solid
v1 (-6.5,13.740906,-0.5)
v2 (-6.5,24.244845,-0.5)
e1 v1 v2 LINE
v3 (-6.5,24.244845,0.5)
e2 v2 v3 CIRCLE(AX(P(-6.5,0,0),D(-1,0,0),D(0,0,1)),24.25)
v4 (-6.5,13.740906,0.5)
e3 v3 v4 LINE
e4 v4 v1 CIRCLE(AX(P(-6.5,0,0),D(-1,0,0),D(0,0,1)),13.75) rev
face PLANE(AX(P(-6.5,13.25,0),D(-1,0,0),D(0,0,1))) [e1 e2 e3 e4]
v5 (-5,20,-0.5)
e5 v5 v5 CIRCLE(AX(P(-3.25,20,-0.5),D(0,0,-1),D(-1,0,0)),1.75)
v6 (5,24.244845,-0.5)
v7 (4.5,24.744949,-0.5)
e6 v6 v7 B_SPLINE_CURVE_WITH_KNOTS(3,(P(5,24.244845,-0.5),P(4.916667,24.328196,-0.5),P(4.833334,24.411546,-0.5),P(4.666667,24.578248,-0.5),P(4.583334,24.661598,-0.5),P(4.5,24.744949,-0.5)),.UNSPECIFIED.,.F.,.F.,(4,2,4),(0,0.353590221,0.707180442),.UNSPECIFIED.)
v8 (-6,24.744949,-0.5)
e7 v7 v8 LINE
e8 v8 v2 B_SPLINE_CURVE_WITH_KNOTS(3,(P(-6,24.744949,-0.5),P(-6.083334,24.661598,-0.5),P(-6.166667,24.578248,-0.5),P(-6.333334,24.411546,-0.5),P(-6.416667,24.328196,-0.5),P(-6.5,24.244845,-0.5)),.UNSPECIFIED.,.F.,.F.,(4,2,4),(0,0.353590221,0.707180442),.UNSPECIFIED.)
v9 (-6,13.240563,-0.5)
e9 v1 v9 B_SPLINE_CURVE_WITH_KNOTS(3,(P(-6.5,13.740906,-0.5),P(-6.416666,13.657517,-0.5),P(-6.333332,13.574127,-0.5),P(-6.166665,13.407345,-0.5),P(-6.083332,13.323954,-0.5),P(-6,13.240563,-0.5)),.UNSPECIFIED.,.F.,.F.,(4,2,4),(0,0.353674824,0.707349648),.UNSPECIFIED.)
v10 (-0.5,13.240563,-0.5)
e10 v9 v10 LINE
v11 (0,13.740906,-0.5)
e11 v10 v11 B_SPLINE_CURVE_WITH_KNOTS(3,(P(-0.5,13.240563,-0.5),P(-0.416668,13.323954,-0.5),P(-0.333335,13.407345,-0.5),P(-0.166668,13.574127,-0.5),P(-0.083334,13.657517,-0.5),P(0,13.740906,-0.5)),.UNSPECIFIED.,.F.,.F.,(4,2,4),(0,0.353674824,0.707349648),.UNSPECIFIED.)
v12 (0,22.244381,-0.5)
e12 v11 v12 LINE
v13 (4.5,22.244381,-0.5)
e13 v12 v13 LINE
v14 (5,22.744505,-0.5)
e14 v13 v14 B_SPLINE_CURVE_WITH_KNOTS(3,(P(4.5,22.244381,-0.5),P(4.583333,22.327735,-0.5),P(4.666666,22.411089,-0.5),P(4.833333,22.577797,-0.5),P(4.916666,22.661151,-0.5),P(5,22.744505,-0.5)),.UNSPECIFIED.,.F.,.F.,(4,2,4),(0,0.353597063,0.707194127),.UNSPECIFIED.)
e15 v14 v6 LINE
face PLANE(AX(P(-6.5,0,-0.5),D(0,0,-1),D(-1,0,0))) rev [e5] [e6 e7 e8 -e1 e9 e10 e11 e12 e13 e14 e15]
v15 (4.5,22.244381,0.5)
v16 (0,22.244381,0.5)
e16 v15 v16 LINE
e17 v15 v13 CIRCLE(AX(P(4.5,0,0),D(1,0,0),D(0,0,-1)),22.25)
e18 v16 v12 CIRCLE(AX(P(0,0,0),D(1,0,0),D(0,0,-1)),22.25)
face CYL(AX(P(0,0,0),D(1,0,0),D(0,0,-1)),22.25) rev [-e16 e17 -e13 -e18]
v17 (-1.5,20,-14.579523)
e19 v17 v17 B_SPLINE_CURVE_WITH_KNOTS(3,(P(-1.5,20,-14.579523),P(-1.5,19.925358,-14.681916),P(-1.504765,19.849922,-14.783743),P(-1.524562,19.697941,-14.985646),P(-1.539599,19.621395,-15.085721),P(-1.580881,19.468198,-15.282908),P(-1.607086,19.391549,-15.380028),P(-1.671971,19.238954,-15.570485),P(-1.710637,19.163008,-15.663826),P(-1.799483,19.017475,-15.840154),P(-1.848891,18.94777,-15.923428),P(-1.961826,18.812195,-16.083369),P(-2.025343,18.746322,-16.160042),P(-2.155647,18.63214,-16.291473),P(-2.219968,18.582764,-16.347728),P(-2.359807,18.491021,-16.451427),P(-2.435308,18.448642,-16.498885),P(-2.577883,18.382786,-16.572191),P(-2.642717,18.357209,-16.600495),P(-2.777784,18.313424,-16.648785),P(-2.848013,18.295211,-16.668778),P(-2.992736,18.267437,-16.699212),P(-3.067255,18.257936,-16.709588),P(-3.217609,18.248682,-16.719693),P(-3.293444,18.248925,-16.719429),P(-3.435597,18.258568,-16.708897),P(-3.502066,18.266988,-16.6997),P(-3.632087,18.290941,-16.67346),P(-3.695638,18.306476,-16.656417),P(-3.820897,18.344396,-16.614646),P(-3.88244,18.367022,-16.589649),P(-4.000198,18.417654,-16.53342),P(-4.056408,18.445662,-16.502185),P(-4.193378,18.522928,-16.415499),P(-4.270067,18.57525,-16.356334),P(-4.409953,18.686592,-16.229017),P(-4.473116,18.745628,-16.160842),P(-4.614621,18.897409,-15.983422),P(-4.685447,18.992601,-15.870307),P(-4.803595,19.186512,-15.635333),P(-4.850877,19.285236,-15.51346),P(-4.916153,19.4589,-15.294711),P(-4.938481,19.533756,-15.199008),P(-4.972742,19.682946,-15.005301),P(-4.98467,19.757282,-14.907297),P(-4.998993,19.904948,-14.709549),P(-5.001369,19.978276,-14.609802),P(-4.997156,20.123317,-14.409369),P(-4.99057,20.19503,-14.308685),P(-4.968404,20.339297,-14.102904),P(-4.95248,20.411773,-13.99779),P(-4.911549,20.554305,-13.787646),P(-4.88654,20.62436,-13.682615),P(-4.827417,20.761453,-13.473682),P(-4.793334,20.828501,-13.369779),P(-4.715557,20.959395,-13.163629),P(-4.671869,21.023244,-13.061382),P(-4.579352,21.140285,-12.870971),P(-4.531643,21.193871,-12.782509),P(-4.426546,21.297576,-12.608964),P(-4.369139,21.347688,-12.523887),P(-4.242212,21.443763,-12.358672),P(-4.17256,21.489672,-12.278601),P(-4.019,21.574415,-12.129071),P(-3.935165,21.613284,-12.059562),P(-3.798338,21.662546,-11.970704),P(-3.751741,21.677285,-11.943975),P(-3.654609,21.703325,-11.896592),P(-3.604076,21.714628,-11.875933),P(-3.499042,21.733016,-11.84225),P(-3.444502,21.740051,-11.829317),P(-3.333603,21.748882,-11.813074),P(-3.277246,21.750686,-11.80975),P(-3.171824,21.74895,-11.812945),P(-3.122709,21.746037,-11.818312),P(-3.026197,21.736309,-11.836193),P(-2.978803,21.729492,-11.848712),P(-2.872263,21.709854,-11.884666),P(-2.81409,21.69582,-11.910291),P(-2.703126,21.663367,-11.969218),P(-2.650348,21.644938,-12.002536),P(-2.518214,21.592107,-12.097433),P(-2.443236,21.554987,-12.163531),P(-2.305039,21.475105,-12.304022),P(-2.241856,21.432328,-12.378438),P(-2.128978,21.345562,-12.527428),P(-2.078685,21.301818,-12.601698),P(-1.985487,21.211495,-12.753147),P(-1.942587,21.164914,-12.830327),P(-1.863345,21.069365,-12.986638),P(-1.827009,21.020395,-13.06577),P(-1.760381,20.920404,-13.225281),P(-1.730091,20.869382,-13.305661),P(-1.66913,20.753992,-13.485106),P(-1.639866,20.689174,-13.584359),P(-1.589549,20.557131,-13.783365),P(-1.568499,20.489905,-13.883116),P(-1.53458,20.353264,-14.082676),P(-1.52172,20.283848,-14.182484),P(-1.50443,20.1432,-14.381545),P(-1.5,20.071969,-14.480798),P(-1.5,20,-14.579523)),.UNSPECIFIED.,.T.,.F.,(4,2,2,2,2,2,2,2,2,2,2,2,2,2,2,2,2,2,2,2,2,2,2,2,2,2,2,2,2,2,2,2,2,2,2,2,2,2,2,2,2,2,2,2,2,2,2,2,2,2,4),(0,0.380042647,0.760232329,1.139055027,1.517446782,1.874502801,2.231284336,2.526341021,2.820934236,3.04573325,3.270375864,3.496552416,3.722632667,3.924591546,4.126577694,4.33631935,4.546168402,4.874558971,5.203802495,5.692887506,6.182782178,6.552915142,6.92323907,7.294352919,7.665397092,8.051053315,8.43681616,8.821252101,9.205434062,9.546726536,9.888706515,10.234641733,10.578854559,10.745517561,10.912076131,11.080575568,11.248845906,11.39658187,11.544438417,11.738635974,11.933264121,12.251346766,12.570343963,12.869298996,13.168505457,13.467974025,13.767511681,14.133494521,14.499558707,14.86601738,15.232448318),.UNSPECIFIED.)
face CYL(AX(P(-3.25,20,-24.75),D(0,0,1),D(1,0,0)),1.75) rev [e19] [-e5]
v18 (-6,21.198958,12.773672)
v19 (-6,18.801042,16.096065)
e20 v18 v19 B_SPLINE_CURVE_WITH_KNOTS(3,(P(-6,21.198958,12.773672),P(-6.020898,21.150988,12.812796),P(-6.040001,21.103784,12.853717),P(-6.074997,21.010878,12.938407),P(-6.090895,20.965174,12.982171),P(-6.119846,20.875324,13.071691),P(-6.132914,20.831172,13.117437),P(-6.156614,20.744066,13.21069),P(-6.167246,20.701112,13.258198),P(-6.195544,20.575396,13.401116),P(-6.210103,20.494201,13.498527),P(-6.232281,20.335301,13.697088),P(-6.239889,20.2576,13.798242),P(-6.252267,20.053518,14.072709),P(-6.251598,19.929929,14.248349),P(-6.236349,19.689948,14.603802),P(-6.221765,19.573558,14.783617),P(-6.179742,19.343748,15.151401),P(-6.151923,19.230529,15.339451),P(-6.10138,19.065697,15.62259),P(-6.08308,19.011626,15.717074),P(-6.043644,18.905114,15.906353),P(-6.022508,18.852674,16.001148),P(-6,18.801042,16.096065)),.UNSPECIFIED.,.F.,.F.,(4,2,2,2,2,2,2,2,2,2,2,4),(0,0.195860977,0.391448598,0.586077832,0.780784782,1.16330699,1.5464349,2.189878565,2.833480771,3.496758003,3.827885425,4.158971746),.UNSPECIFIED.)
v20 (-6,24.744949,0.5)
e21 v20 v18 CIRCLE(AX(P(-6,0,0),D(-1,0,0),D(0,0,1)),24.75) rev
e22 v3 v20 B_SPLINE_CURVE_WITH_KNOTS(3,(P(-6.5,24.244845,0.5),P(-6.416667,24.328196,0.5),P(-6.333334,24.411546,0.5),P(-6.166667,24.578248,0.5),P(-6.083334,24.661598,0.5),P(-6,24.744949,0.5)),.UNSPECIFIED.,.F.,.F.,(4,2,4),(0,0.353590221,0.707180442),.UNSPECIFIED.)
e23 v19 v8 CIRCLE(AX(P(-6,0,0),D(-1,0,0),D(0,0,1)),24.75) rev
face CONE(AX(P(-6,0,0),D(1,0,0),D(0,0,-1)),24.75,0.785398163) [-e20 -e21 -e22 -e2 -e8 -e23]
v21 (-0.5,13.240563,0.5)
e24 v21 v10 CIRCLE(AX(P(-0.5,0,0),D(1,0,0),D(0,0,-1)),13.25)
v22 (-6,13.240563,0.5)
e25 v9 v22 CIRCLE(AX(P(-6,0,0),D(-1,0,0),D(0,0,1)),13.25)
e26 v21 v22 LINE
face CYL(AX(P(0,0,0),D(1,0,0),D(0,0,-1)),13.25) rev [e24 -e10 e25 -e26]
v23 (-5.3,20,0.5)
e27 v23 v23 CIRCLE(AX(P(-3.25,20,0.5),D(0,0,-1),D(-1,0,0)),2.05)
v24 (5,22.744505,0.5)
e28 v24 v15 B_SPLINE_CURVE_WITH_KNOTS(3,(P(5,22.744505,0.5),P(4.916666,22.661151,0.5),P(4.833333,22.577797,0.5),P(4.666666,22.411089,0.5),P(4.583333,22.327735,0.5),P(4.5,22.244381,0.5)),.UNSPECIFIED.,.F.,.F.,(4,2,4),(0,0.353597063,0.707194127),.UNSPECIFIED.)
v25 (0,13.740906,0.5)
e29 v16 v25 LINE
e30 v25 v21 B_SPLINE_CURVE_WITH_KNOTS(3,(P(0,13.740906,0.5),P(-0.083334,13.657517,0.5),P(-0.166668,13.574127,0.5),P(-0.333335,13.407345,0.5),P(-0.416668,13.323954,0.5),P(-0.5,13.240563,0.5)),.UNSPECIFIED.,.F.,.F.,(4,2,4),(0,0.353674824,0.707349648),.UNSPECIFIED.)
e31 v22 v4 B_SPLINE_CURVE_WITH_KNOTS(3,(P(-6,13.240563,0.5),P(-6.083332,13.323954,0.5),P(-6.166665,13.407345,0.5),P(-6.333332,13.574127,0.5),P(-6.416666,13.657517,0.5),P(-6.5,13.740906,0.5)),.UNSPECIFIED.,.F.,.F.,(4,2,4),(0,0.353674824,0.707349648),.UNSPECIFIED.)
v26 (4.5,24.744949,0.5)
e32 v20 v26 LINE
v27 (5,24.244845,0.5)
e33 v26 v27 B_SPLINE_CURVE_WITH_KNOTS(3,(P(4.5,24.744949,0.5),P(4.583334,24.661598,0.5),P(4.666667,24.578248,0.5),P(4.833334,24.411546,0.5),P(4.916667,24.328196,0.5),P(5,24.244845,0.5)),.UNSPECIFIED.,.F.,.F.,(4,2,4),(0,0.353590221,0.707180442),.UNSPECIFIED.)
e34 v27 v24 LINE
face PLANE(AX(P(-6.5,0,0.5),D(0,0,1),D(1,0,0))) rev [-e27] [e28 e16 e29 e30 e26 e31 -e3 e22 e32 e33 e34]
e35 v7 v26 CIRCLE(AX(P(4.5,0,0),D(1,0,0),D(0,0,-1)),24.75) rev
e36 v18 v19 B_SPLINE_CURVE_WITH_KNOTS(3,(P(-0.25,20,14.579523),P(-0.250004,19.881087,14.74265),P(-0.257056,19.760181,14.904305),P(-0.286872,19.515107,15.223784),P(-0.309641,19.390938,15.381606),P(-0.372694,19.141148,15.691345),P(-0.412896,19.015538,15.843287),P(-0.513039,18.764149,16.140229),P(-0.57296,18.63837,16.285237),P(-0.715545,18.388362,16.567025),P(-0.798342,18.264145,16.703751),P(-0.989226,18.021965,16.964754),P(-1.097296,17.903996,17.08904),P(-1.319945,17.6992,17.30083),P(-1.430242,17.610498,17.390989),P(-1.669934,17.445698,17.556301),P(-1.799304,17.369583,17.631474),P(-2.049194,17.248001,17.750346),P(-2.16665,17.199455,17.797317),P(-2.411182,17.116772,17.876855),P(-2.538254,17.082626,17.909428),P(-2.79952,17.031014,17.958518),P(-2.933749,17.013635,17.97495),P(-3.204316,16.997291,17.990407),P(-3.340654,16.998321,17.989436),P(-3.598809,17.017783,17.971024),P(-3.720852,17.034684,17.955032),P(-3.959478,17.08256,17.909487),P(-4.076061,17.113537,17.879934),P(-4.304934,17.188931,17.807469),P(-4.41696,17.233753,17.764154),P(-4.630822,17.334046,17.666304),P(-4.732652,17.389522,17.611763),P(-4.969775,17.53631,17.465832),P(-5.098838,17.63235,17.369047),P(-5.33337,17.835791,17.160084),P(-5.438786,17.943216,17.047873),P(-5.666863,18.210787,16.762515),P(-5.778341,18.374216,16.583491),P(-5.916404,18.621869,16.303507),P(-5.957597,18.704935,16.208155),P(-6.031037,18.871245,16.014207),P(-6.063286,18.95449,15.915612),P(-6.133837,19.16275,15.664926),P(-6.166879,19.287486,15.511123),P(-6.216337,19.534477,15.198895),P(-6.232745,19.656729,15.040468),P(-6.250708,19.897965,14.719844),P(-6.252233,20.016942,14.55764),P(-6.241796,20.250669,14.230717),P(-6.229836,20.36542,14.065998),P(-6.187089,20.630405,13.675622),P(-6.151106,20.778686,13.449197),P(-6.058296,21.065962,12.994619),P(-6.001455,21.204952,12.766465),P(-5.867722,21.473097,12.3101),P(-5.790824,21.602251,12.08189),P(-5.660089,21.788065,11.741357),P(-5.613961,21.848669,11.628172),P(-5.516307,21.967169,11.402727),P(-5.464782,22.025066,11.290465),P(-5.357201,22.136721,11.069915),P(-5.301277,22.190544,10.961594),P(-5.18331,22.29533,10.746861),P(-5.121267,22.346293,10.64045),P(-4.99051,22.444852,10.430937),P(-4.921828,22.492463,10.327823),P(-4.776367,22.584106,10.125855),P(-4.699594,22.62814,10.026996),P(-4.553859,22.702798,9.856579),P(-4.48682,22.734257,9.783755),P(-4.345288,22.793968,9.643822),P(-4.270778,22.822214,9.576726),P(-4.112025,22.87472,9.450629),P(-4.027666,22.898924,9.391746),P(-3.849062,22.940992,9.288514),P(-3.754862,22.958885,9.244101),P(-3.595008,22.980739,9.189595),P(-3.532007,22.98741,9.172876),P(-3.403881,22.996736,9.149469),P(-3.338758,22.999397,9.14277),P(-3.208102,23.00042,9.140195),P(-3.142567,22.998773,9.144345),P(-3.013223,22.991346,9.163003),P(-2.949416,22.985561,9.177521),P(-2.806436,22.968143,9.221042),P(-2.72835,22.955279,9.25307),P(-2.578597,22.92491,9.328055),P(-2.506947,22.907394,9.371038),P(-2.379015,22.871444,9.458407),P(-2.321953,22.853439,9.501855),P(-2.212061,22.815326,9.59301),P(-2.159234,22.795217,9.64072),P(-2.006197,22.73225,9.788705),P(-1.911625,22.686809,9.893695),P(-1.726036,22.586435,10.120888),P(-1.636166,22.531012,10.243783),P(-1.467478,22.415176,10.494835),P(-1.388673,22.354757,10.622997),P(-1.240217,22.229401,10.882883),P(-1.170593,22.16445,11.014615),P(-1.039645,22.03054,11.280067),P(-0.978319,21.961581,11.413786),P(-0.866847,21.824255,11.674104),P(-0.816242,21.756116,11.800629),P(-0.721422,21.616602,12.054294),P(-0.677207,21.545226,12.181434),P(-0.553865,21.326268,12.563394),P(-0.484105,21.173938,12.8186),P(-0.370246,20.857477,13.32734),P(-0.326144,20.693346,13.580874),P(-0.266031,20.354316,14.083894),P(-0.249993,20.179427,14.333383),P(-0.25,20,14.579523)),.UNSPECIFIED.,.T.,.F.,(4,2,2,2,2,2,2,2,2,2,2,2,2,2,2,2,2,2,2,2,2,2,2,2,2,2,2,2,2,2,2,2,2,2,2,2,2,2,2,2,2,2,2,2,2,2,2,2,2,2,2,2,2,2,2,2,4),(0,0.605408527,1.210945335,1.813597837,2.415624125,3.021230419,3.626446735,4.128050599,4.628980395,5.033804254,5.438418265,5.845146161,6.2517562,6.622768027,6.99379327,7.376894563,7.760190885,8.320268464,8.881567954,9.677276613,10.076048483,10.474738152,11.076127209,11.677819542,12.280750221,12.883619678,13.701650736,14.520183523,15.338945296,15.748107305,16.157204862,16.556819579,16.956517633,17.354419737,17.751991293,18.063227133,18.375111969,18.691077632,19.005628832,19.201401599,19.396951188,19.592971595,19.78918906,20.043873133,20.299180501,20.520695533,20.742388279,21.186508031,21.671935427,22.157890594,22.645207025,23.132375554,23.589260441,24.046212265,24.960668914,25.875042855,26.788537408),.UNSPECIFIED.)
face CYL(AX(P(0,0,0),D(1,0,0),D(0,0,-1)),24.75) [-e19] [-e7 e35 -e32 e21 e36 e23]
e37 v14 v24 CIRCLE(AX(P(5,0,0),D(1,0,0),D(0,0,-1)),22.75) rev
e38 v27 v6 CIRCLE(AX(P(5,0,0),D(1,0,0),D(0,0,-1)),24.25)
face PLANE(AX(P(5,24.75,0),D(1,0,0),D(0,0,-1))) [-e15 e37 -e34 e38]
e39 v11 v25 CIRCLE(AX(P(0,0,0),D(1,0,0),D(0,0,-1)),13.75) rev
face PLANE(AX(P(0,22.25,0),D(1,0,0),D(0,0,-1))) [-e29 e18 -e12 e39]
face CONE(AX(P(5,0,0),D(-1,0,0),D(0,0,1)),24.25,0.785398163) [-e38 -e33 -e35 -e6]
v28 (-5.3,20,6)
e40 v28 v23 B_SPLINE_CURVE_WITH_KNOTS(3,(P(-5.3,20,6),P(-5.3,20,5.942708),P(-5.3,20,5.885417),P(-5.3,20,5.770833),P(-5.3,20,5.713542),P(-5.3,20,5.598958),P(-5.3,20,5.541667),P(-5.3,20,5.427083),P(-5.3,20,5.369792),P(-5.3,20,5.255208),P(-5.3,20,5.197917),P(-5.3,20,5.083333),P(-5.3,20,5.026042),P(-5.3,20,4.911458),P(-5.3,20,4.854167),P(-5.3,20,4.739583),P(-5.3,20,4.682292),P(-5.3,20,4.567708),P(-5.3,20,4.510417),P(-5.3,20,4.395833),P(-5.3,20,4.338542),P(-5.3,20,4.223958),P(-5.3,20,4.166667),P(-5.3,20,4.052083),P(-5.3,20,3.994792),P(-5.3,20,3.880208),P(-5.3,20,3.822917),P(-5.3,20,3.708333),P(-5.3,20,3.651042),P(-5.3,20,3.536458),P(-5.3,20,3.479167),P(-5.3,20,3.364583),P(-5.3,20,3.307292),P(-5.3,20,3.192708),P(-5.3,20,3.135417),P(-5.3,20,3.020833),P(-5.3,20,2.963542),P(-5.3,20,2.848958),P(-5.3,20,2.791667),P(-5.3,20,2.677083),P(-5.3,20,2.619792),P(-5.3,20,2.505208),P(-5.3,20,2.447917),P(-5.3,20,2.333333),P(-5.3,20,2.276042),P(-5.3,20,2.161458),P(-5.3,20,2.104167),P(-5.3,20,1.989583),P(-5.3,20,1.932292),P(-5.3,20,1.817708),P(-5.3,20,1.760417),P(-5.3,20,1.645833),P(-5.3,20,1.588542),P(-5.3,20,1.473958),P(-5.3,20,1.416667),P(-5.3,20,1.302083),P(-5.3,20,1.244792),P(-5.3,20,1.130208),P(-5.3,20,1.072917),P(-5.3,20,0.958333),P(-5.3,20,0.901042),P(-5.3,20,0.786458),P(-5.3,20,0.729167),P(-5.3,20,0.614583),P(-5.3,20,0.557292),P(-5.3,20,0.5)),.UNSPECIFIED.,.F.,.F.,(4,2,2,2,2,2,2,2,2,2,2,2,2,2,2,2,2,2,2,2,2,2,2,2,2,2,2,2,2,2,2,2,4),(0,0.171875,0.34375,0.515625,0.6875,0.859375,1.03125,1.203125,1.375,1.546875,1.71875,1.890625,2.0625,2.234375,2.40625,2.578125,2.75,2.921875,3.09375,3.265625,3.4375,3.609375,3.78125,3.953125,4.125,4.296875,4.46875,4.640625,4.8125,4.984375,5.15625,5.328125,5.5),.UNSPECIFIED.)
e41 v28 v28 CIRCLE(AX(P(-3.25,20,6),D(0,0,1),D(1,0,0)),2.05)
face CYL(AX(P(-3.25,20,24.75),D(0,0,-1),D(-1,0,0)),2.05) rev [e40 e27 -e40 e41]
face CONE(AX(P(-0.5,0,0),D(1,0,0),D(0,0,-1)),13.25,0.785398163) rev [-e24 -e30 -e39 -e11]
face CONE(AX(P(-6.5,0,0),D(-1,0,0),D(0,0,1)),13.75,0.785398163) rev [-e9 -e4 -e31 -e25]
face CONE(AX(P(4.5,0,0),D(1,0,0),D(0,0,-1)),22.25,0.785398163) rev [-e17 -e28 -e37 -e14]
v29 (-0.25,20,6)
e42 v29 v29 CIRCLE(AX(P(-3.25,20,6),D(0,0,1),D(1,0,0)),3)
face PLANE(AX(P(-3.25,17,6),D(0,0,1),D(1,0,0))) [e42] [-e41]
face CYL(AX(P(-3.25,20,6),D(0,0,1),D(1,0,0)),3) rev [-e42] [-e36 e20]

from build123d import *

# Parameters (mm, degrees)
ESQUISSE2_W                  = 1
ESQUISSE2_H                  = 24.75
ENL_V_MAT_EXTRU_1_DEPTH      = 37.842570486
ENL_V_MAT_EXTRU_2_DEPTH      = 36.600210674
ENL_V_MAT_EXTRU_2_DEPTH_BACK = 36.600210674
ESQUISSE3_R                  = 1.75
ESQUISSE4_W                  = 11.987843117
ESQUISSE4_H                  = 3
CHANFREIN1_SIZE              = 0.5
ESQUISSE5_R                  = 2.05
ENL_V_MAT_EXTRU_3_DEPTH      = 36.949617679


with BuildPart() as part:
    # Esquisse1 → Révolution1 (revolve)
    with BuildSketch(Plane.XY, mode=Mode.PRIVATE) as r_volution1_sk:
        Polygon((0, 13.25), (-6.5, 13.25), (-6.5, 24.75), (5, 24.75), (5, 22.25), (0, 22.25), align=None)
    revolve(r_volution1_sk.sketch.rotate(Axis((0, 0, 0), (-1, 0, 0)), 90), axis=Axis((0, 0, 0), (-1, 0, 0)))

    # Esquisse2 → Enlèv. mat.-Extru.1 (cut, through all)
    with BuildSketch(Plane(origin=(5, 0, 0), x_dir=(0, 0, -1), z_dir=(1, 0, 0))):
        with Locations((0, 12.375)):
            Rectangle(ESQUISSE2_W, ESQUISSE2_H)
    extrude(amount=-ENL_V_MAT_EXTRU_1_DEPTH, mode=Mode.SUBTRACT)

    # Esquisse3 → Enlèv. mat.-Extru.2 (cut, two sides: drawn at the far end of the back side and taken through both)
    with BuildSketch(Plane.XY.offset(-ENL_V_MAT_EXTRU_2_DEPTH_BACK)):
        with Locations((-3.25, 20)):
            Circle(ESQUISSE3_R)
    extrude(amount=ENL_V_MAT_EXTRU_2_DEPTH + ENL_V_MAT_EXTRU_2_DEPTH_BACK, mode=Mode.SUBTRACT)

    # Esquisse4 → Enlèvement de matière-Révolution1 (revolve, cut)
    with BuildSketch(Plane.ZY.offset(3.25), mode=Mode.PRIVATE) as enl_vement_de_mati_re_r_volution1_sk:
        with Locations((11.993921559, 18.5)):
            Rectangle(ESQUISSE4_W, ESQUISSE4_H)
    revolve(enl_vement_de_mati_re_r_volution1_sk.sketch.rotate(Axis((-3.25, 20, 6), (0, 0, -1)), 270), axis=Axis((-3.25, 20, 6), (0, 0, -1)), mode=Mode.SUBTRACT)

    # Chanfrein1
    # the kernel refuses this chamfer: 0.5 mm, written as the material it takes off along each edge
    with BuildSketch(Plane(origin=(5, 0, 0), x_dir=(0, 0, -1), z_dir=(0, 1, 0))) as chanfrein1_piece_1:
        Polygon((22.25, CHANFREIN1_SIZE), (22.25 + CHANFREIN1_SIZE, 0), (22.25, 0), align=None)
    chanfrein1_piece_1_solid = revolve(axis=Axis((5, 0, 0), (-1, 0, 0)), revolution_arc=272.035388743, mode=Mode.PRIVATE)
    with BuildSketch(Plane(origin=(5, 0, 0), x_dir=(0, 0, -1), z_dir=(0, 1, 0))) as chanfrein1_piece_2:
        Polygon((24.75, CHANFREIN1_SIZE), (24.75 - CHANFREIN1_SIZE, 0), (24.75, 0), align=None)
    chanfrein1_piece_2_solid = revolve(axis=Axis((5, 0, 0), (-1, 0, 0)), revolution_arc=271.829822987, mode=Mode.PRIVATE)
    with BuildSketch(Plane(origin=(-6.5, 0, 0), x_dir=(0, 0, -1), z_dir=(0, 1, 0))) as chanfrein1_piece_3:
        Polygon((24.75, -CHANFREIN1_SIZE), (24.75 - CHANFREIN1_SIZE, 0), (24.75, 0), align=None)
    chanfrein1_piece_3_solid = revolve(axis=Axis((-6.5, 0, 0), (-1, 0, 0)), revolution_arc=271.829822987, mode=Mode.PRIVATE)
    with BuildSketch(Plane(origin=(0, 0, 0), x_dir=(0, 0, -1), z_dir=(0, 1, 0))) as chanfrein1_piece_4:
        Polygon((13.25, CHANFREIN1_SIZE), (13.25 + CHANFREIN1_SIZE, 0), (13.25, 0), align=None)
    chanfrein1_piece_4_solid = revolve(axis=Axis((0, 0, 0), (-1, 0, 0)), revolution_arc=273.417455425, mode=Mode.PRIVATE)
    with BuildSketch(Plane(origin=(-6.5, 0, 0), x_dir=(0, 0, -1), z_dir=(0, 1, 0))) as chanfrein1_piece_5:
        Polygon((13.25, -CHANFREIN1_SIZE), (13.25 + CHANFREIN1_SIZE, 0), (13.25, 0), align=None)
    chanfrein1_piece_5_solid = revolve(axis=Axis((-6.5, 0, 0), (-1, 0, 0)), revolution_arc=273.417455425, mode=Mode.PRIVATE)
    with BuildSketch(Plane(origin=(-6.5, 0, 0), x_dir=(0, 0.9982400789051599, 0.059302148927506945), z_dir=(0, -0.059302148927506945, 0.9982400789051599))) as chanfrein1_piece_6:
        Polygon((13.25, -CHANFREIN1_SIZE), (13.25 + CHANFREIN1_SIZE, 0), (13.25, 0), align=None)
    chanfrein1_piece_6_solid = revolve(axis=Axis((-6.5, 0, 0), (-1, 0, 0)), revolution_arc=93.399757519, mode=Mode.PRIVATE)
    with BuildSketch(Plane(origin=(0, 0, 0), x_dir=(0, 0.9982400789051599, 0.059302148927506945), z_dir=(0, -0.059302148927506945, 0.9982400789051599))) as chanfrein1_piece_7:
        Polygon((13.25 + CHANFREIN1_SIZE, 0), (13.25, CHANFREIN1_SIZE), (13.25, 0), align=None)
    chanfrein1_piece_7_solid = revolve(axis=Axis((0, 0, 0), (-1, 0, 0)), revolution_arc=93.399757519, mode=Mode.PRIVATE)
    with BuildSketch(Plane(origin=(-6.5, 0, 0), x_dir=(0, 0.9994953717545437, 0.0317647893310561), z_dir=(0, -0.0317647893310561, 0.9994953717545437))) as chanfrein1_piece_8:
        Polygon((24.75, -CHANFREIN1_SIZE), (24.75 - CHANFREIN1_SIZE, 0), (24.75, 0), align=None)
    chanfrein1_piece_8_solid = revolve(axis=Axis((-6.5, 0, 0), (-1, 0, 0)), revolution_arc=91.820294567, mode=Mode.PRIVATE)
    with BuildSketch(Plane(origin=(5, 0, 0), x_dir=(0, 0.9994953717545433, 0.03176478933106764), z_dir=(0, -0.03176478933106764, 0.9994953717545433))) as chanfrein1_piece_9:
        Polygon((24.75, CHANFREIN1_SIZE), (24.75 - CHANFREIN1_SIZE, 0), (24.75, 0), align=None)
    chanfrein1_piece_9_solid = revolve(axis=Axis((5, 0, 0), (-1, 0, 0)), revolution_arc=91.820294567, mode=Mode.PRIVATE)
    with BuildSketch(Plane(origin=(5, 0, 0), x_dir=(0, 0.9993756290126987, 0.03533202705015153), z_dir=(0, -0.03533202705015153, 0.9993756290126987))) as chanfrein1_piece_10:
        Polygon((22.25, CHANFREIN1_SIZE), (22.25 + CHANFREIN1_SIZE, 0), (22.25, 0), align=None)
    chanfrein1_piece_10_solid = revolve(axis=Axis((5, 0, 0), (-1, 0, 0)), revolution_arc=92.024797457, mode=Mode.PRIVATE)
    add([chanfrein1_piece_1_solid, chanfrein1_piece_2_solid, chanfrein1_piece_3_solid, chanfrein1_piece_4_solid, chanfrein1_piece_5_solid, chanfrein1_piece_6_solid, chanfrein1_piece_7_solid, chanfrein1_piece_8_solid, chanfrein1_piece_9_solid, chanfrein1_piece_10_solid], mode=Mode.SUBTRACT)

    # Esquisse5 → Enlèv. mat.-Extru.3 (cut, through all)
    with BuildSketch(Plane(origin=(0, 0, 0.5), x_dir=(-1, 0, 0), z_dir=(0, 0, -1))):
        with Locations((3.25, 20)):
            Circle(ESQUISSE5_R)
    extrude(amount=-ENL_V_MAT_EXTRU_3_DEPTH, mode=Mode.SUBTRACT)


solid = part.part
